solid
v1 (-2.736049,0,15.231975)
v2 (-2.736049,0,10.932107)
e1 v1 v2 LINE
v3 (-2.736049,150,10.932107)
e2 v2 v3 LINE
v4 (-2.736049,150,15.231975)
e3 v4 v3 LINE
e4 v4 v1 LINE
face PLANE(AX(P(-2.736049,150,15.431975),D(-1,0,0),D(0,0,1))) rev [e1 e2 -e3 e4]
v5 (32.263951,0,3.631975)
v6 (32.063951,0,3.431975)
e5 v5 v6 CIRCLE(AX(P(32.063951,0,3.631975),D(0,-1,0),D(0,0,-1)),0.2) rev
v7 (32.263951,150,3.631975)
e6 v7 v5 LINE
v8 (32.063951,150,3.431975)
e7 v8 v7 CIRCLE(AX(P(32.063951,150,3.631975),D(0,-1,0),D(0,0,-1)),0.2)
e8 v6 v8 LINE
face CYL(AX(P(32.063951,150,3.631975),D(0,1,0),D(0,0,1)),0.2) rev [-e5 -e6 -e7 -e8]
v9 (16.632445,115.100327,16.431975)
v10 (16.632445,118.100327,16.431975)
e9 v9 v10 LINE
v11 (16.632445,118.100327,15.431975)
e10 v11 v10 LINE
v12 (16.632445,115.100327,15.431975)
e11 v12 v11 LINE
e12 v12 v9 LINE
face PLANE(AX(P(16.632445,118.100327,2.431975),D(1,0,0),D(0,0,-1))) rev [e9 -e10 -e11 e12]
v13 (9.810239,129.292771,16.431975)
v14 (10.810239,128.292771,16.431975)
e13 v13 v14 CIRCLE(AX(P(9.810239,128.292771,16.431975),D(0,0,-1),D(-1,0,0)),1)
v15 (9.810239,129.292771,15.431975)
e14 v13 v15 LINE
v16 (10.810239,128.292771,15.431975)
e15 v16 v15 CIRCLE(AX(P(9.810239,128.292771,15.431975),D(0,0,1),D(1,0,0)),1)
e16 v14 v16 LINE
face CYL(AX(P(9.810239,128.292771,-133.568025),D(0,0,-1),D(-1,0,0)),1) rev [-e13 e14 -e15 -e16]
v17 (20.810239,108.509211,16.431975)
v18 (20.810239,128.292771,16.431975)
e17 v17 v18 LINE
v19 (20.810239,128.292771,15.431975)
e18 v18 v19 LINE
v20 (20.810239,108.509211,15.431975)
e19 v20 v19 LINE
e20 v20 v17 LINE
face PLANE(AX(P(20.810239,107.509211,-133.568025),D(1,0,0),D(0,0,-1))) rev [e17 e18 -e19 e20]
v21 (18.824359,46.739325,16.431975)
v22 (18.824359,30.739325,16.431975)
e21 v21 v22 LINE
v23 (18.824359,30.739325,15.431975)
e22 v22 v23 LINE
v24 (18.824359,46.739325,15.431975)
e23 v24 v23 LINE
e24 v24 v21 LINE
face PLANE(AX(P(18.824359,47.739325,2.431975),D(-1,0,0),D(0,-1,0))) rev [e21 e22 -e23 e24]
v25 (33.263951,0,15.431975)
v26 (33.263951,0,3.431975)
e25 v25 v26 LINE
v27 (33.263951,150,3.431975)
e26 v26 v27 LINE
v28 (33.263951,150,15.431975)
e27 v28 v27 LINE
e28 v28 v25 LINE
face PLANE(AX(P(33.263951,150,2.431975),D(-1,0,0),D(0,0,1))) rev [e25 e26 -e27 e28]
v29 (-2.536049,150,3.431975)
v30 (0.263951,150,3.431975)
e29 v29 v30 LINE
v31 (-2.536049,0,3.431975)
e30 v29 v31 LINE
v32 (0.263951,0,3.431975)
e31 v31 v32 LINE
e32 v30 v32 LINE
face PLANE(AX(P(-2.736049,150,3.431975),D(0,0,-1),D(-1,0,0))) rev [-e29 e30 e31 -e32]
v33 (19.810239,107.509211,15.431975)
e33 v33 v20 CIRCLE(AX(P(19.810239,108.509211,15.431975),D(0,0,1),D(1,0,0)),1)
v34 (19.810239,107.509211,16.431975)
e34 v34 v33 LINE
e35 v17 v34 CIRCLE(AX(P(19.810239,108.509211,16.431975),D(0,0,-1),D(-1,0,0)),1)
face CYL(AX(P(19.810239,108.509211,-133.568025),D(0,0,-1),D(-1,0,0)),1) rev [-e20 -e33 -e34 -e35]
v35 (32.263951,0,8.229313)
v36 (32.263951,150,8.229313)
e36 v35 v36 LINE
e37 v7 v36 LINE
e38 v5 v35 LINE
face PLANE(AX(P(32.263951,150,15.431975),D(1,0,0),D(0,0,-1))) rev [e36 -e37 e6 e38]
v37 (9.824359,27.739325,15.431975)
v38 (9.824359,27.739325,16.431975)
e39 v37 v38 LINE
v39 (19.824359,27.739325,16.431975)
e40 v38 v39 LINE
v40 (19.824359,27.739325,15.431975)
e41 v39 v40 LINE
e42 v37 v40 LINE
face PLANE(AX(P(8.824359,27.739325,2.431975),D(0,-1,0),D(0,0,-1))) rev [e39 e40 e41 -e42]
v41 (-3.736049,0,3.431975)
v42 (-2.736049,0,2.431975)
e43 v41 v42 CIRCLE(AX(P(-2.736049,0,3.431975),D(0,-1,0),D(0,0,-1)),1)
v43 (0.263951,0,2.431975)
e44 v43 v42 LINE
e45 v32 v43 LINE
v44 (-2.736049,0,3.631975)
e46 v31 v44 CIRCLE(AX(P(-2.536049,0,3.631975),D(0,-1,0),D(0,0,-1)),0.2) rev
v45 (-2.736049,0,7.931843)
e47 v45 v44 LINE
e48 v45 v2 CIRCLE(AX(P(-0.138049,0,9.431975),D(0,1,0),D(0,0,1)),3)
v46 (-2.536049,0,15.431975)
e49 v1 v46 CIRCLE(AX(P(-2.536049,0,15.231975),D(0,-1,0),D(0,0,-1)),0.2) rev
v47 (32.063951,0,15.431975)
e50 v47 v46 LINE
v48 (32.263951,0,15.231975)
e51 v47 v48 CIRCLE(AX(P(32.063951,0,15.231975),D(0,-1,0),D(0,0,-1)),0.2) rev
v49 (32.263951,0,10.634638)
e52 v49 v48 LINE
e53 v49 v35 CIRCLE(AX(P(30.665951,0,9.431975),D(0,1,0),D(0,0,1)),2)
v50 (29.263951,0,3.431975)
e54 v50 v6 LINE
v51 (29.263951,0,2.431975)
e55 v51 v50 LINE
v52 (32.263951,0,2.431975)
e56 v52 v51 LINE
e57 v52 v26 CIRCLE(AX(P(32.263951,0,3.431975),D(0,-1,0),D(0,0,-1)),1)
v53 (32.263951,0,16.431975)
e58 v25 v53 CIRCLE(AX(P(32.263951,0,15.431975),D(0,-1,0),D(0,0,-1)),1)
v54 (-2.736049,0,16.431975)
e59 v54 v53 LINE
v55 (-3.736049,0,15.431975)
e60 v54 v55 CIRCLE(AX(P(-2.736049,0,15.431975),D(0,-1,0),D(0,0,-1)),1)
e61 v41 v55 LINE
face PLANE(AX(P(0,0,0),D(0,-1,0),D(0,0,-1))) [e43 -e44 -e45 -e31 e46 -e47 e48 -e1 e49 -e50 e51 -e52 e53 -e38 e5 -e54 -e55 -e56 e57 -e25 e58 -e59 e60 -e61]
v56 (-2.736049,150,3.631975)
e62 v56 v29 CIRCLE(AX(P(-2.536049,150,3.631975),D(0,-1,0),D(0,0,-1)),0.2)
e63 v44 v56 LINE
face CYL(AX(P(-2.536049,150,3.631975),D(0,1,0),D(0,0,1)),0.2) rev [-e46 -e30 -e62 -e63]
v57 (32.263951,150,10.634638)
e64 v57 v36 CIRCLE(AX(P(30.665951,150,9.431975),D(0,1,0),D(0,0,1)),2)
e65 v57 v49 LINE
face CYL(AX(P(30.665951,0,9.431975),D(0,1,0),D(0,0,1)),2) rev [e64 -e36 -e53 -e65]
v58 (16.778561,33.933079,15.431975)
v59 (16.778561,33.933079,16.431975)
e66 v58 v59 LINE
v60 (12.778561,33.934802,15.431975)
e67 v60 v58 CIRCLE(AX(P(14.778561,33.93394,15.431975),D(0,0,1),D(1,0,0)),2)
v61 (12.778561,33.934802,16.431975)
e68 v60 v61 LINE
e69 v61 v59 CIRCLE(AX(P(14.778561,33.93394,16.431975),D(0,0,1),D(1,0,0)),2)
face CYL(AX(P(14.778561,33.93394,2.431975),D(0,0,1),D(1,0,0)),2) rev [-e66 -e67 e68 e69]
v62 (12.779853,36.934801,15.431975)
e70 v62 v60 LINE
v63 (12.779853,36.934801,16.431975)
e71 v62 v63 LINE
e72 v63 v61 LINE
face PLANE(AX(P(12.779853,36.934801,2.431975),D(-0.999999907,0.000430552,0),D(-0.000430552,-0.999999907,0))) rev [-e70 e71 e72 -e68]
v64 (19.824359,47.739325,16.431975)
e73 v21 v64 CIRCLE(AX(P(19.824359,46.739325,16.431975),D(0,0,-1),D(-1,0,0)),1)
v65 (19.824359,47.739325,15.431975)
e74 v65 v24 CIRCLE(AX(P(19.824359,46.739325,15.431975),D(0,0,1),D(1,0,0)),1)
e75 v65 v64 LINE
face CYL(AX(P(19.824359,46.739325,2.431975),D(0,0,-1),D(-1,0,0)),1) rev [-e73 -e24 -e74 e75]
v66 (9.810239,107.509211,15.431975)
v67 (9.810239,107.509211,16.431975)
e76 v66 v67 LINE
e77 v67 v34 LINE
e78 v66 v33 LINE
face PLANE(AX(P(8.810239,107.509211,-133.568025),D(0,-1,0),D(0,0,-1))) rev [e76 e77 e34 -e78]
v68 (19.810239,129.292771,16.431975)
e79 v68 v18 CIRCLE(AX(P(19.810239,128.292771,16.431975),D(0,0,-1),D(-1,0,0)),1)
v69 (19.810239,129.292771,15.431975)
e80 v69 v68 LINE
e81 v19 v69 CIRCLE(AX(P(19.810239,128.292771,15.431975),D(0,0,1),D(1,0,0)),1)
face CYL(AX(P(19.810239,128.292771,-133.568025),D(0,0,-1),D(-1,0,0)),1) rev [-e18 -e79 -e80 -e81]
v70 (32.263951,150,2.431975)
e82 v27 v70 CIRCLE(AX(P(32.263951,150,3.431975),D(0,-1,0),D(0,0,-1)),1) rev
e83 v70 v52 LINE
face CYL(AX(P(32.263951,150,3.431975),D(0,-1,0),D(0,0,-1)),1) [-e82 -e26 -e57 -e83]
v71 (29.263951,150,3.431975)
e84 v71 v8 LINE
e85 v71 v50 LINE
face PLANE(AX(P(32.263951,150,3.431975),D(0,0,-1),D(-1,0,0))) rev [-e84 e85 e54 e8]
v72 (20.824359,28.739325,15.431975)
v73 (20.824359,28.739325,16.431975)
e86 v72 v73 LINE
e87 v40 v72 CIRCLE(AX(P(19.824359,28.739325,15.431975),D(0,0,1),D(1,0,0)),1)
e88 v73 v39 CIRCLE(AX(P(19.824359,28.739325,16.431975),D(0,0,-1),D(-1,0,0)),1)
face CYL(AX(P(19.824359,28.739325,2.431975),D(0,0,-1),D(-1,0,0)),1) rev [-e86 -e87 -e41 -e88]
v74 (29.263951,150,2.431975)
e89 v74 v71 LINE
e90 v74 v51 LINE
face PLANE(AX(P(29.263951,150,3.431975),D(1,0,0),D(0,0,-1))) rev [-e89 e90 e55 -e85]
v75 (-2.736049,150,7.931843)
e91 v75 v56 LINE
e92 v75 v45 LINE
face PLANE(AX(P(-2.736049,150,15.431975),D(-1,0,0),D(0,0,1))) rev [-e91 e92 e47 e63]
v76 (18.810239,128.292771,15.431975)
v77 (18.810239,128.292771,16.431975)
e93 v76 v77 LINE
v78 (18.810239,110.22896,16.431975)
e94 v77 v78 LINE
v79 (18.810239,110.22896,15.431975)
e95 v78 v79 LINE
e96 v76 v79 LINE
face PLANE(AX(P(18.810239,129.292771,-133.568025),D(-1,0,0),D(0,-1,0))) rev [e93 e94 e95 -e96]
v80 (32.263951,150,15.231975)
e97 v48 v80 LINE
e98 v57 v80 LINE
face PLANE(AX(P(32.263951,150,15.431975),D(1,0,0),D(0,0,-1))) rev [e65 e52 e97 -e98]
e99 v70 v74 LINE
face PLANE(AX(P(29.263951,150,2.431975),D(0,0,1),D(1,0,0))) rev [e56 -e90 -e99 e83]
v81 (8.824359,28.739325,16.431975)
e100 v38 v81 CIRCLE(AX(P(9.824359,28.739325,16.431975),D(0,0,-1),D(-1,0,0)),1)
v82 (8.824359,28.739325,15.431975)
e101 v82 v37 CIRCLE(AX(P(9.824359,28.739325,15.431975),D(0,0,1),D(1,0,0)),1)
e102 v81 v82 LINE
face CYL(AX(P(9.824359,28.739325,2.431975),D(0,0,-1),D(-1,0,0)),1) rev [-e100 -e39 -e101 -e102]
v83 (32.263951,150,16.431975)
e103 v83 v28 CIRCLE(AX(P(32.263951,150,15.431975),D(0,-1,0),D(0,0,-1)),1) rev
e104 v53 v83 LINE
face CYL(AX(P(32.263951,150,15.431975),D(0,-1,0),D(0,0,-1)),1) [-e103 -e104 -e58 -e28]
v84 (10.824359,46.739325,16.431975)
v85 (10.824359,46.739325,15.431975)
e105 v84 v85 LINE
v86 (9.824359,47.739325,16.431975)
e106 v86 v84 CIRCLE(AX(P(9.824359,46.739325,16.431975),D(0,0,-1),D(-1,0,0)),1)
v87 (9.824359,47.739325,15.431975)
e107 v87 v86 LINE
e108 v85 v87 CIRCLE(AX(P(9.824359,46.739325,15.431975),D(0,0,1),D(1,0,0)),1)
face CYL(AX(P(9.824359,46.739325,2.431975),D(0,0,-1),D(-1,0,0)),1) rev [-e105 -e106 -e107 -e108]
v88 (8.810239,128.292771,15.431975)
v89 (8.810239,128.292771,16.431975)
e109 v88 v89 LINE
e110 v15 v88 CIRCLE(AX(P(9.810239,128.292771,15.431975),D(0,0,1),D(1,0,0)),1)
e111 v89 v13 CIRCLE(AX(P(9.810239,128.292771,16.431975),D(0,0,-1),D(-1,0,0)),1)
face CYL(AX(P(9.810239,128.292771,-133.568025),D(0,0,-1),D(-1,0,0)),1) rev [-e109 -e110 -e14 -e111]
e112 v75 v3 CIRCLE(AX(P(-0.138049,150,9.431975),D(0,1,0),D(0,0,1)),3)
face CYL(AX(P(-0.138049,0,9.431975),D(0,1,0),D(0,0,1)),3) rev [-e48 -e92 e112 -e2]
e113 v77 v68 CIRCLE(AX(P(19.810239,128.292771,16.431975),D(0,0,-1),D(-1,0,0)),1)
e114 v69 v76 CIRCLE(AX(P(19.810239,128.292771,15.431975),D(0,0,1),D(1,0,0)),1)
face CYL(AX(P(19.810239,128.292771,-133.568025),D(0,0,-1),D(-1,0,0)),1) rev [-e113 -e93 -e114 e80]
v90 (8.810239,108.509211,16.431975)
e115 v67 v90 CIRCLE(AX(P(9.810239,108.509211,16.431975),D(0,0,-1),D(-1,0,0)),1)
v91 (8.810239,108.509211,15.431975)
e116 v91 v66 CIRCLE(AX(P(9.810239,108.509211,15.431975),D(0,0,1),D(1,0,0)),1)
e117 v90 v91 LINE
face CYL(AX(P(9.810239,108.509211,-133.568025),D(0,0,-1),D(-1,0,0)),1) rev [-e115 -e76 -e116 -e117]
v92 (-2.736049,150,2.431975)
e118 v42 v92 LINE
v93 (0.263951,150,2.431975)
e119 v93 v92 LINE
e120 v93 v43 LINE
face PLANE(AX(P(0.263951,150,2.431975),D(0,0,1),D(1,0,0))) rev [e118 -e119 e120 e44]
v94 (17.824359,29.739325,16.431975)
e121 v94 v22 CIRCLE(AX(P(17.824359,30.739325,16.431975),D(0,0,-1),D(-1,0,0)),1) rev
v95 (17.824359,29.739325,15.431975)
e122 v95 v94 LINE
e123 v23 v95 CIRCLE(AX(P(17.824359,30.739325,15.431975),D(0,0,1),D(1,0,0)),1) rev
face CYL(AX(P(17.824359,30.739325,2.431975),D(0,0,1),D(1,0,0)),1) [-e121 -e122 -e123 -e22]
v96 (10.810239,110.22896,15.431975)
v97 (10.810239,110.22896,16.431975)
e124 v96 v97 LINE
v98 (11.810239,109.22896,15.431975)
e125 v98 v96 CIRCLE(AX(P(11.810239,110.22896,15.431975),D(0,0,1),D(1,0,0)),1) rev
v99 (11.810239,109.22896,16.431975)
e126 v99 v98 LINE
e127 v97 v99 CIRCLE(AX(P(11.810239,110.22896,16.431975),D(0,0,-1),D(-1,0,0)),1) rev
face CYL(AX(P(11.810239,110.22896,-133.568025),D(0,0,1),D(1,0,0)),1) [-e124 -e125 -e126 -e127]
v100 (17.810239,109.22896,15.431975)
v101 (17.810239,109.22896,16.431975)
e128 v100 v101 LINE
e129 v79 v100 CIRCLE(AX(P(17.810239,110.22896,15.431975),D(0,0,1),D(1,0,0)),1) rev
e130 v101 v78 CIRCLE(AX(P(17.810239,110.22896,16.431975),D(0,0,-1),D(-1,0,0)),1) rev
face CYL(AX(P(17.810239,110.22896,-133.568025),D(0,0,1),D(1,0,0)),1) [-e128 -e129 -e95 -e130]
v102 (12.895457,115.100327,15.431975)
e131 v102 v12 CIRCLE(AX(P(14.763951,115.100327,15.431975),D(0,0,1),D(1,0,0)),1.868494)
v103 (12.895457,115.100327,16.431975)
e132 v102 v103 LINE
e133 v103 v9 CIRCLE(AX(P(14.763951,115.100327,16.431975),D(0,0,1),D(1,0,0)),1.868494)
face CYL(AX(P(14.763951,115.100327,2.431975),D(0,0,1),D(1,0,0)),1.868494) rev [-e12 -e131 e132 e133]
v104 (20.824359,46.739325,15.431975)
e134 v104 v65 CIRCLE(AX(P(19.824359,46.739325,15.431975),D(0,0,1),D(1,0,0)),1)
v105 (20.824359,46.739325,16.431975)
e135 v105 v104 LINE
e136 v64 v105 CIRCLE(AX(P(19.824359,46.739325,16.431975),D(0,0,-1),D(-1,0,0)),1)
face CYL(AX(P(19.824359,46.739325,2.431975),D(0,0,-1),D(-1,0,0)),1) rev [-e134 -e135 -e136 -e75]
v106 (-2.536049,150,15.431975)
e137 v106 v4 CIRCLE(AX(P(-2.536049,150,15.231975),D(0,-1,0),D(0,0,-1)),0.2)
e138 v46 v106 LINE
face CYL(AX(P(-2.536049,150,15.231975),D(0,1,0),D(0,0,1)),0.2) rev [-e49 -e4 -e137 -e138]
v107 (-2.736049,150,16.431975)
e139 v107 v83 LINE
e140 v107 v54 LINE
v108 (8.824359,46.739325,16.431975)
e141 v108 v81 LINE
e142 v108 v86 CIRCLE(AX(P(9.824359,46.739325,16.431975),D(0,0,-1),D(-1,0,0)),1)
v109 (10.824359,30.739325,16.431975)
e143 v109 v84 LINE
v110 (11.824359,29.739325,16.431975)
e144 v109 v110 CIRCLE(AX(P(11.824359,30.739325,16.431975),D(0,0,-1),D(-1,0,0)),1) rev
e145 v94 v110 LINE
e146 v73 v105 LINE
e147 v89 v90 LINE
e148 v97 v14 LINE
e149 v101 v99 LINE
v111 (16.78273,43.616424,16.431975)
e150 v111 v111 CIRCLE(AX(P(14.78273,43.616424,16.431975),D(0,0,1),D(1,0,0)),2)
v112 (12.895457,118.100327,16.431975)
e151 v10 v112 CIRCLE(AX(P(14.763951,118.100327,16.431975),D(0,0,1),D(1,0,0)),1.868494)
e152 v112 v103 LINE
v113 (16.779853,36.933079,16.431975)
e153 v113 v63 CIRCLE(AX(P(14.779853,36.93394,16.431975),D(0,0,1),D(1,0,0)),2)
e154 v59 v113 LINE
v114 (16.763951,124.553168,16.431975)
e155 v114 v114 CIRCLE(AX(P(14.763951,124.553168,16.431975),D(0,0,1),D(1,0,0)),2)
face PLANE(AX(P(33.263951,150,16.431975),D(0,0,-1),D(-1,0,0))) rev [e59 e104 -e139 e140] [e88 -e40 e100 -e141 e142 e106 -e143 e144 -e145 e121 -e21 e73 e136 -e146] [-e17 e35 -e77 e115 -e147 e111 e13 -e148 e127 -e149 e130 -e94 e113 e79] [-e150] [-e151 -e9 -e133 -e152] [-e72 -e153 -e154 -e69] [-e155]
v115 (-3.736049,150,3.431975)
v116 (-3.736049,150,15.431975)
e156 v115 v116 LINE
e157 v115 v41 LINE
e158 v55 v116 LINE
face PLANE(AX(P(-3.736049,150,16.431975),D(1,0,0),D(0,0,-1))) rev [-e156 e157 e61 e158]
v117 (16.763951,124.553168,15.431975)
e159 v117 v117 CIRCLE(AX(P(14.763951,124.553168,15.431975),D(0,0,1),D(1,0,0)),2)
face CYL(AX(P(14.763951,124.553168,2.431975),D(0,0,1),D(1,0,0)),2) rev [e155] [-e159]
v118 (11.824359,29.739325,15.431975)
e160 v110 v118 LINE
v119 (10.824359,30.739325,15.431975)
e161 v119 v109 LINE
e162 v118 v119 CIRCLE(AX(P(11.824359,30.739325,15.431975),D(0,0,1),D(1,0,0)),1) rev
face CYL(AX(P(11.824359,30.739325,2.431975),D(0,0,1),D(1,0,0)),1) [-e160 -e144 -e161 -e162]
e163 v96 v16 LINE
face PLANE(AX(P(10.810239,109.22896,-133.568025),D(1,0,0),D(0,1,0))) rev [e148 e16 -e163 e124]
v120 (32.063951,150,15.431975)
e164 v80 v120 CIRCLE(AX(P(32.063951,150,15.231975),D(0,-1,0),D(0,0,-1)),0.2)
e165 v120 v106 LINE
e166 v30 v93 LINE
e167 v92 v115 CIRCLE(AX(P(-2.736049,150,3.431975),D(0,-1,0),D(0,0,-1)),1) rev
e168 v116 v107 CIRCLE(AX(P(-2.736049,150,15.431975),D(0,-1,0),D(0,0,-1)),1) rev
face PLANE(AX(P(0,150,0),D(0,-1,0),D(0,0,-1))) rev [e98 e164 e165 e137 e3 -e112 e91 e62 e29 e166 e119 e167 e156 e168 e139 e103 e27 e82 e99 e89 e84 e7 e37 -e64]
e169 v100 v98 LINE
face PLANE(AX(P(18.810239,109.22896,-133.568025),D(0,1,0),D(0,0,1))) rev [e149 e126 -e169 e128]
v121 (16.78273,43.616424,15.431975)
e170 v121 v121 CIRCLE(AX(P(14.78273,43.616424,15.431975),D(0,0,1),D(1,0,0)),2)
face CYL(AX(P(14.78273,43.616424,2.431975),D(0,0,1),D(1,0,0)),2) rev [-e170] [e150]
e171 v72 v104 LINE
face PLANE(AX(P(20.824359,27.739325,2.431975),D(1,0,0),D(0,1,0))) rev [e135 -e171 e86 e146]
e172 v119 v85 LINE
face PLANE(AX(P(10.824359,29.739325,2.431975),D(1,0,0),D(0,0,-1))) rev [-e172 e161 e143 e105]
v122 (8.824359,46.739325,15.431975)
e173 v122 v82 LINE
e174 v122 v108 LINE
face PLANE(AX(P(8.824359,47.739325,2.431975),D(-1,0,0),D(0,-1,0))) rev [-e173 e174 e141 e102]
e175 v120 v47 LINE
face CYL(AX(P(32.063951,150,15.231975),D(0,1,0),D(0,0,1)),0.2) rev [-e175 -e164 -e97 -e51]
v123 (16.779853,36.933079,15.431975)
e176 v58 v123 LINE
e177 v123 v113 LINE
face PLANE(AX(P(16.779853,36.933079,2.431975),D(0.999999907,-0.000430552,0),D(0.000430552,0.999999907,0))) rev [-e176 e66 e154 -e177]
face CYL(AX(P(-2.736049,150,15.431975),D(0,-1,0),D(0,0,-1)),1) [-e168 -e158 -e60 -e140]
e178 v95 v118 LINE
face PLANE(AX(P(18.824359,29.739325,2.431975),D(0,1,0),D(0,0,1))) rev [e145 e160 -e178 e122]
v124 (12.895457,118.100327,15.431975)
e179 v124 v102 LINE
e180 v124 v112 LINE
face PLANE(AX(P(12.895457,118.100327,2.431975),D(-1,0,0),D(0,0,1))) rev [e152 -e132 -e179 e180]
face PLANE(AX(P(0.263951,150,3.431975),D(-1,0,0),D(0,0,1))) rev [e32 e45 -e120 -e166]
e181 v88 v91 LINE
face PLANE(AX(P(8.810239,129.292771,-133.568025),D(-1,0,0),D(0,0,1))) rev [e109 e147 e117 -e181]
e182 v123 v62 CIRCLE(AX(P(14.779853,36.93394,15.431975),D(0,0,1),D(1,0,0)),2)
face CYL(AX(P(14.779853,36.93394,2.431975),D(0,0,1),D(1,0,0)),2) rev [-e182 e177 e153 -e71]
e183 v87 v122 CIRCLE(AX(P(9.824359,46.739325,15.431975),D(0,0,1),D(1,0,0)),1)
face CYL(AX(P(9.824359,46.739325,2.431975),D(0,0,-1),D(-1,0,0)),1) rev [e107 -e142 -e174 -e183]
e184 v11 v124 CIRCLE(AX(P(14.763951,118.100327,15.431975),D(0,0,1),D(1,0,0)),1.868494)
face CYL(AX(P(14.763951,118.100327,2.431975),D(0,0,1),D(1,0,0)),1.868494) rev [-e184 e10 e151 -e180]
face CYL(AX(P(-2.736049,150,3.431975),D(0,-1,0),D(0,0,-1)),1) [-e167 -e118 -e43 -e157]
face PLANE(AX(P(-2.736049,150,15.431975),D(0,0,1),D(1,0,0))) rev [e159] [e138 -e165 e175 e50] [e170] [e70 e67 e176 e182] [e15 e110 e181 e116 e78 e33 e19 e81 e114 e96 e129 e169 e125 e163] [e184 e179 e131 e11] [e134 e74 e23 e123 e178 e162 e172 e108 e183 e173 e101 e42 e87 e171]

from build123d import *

# Parameters (mm, degrees)
BOSS_EXTRUDE1_DEPTH = 150
FILLET1_R           = 1
FILLET2_R           = 0.2
SKETCH2_R           = 2
CUT_EXTRUDE1_DEPTH  = 155.280557534
CUT_EXTRUDE2_DEPTH  = 155.280557534
CUT_EXTRUDE3_DEPTH  = 150
FILLET7_R           = 1
SKETCH7_R           = 2
CUT_EXTRUDE4_DEPTH  = 155.280557534
CUT_EXTRUDE6_DEPTH  = 155.280557534
FILLET9_R           = 1
SKETCH12_R          = 2
SKETCH12_R_2        = 3
CUT_EXTRUDE7_DEPTH  = 155.520226026


with BuildPart() as part:
    # Sketch1 → Boss-Extrude1 (new body)
    with BuildSketch(Plane(origin=(0, 0, 0), x_dir=(1, 0, 0), z_dir=(0, 1, 0))):
        Polygon((-2.736049046, -15.431975477), (32.263950954, -15.431975477), (32.263950954, -3.431975477), (29.263950954, -3.431975477), (29.263950954, -2.431975477), (33.263950954, -2.431975477), (33.263950954, -16.431975477), (-3.736049046, -16.431975477), (-3.736049046, -2.431975477), (0.263950954, -2.431975477), (0.263950954, -3.431975477), (-2.736049046, -3.431975477), align=None)
    extrude(amount=BOSS_EXTRUDE1_DEPTH)

    # Fillet1
    fillet1_edges = [part.edges().sort_by_distance(p)[0] for p in [
        (33.263950954, 75, 2.431975477),
        (33.263950954, 75, 16.431975477),
        (-3.736049046, 75, 16.431975477),
        (-3.736049046, 75, 2.431975477),
    ]]
    fillet(fillet1_edges, radius=FILLET1_R)

    # Fillet2
    fillet2_edges = [part.edges().sort_by_distance(p)[0] for p in [
        (-2.736049046, 75, 15.431975477),
        (32.263950954, 75, 15.431975477),
        (32.263950954, 75, 3.431975477),
        (-2.736049046, 75, 3.431975477),
    ]]
    fillet(fillet2_edges, radius=FILLET2_R)

    # Sketch2 → Cut-Extrude1 (cut, through all)
    with BuildSketch(Plane.XY.offset(16.431975477)):
        with Locations((14.763950954, 124.553168405)):
            Circle(SKETCH2_R)
    extrude(amount=-CUT_EXTRUDE1_DEPTH, mode=Mode.SUBTRACT)

    # Sketch4 → Cut-Extrude2 (cut, through all)
    with BuildSketch(Plane.XY.offset(16.431975477)):
        with BuildLine():
            Line((16.632444953, 118.100326697), (16.632444953, 115.100326697))
            ThreePointArc((16.632444953, 115.100326697), (14.763950954, 113.231832698), (12.895456955, 115.100326697))
            Line((12.895456955, 115.100326697), (12.895456955, 118.100326697))
            ThreePointArc((12.895456955, 118.100326697), (14.763950954, 119.968820696), (16.632444953, 118.100326697))
        make_face()
    extrude(amount=-CUT_EXTRUDE2_DEPTH, mode=Mode.SUBTRACT)

    # Sketch6 → Cut-Extrude3 (cut)
    with BuildSketch(Plane.XY.offset(16.431975477)):
        Polygon((18.810239274, 129.292771491), (18.810239274, 109.228960099), (10.810239274, 109.228960099), (10.810239274, 129.292771491), (8.810239274, 129.292771491), (8.810239274, 107.509210665), (20.810239274, 107.509210665), (20.810239274, 129.292771491), align=None)
    extrude(amount=-CUT_EXTRUDE3_DEPTH, mode=Mode.SUBTRACT)

    # Fillet7
    fillet7_edges = [part.edges().sort_by_distance(p)[0] for p in [
        (8.810239274, 107.509210665, 15.931975477),
        (20.810239274, 107.509210665, 15.931975477),
        (18.810239274, 109.228960099, 15.931975477),
        (10.810239274, 109.228960099, 15.931975477),
        (10.810239274, 129.292771491, 15.931975477),
        (8.810239274, 129.292771491, 15.931975477),
        (18.810239274, 129.292771491, 15.931975477),
        (20.810239274, 129.292771491, 15.931975477),
    ]]
    fillet(fillet7_edges, radius=FILLET7_R - 0.0001)  # a hair under: the kernel refuses the full size

    # Sketch7 → Cut-Extrude4 (cut, through all)
    with BuildSketch(Plane.XY.offset(16.431975477)):
        with Locations((14.782730099, 43.616424241)):
            Circle(SKETCH7_R)
        with BuildLine():
            Line((16.779852756, 36.933079114), (16.778561099, 33.933079392))
            ThreePointArc((16.778561099, 33.933079392), (14.77770018, 31.933940682), (12.77856147, 33.9348016))
            Line((12.77856147, 33.9348016), (12.779853126, 36.934801322))
            ThreePointArc((12.779853126, 36.934801322), (14.780714045, 38.933940033), (16.779852756, 36.933079114))
        make_face()
    extrude(amount=-CUT_EXTRUDE4_DEPTH, mode=Mode.SUBTRACT)

    # Sketch9 → Cut-Extrude6 (cut, through all)
    with BuildSketch(Plane.XY.offset(16.431975477)):
        Polygon((18.824358564, 47.739325349), (18.824358564, 29.739325349), (10.824358564, 29.739325349), (10.824358564, 47.739325349), (8.824358564, 47.739325349), (8.824358564, 27.739325349), (20.824358564, 27.739325349), (20.824358564, 47.739325349), align=None)
    extrude(amount=-CUT_EXTRUDE6_DEPTH, mode=Mode.SUBTRACT)

    # Fillet9
    fillet9_edges = [part.edges().sort_by_distance(p)[0] for p in [
        (20.824358564, 27.739325349, 15.931975477),
        (18.824358564, 29.739325349, 15.931975477),
        (8.824358564, 27.739325349, 15.931975477),
        (10.824358564, 29.739325349, 15.931975477),
        (8.824358564, 47.739325349, 15.931975477),
        (10.824358564, 47.739325349, 15.931975477),
        (18.824358564, 47.739325349, 15.931975477),
        (20.824358564, 47.739325349, 15.931975477),
    ]]
    fillet(fillet9_edges, radius=FILLET9_R - 0.0001)  # a hair under: the kernel refuses the full size

    # Sketch12 → Cut-Extrude7 (cut, through all)
    with BuildSketch(Plane(origin=(0, 150, 0), x_dir=(1, 0, 0), z_dir=(0, 1, 0))):
        with Locations((30.665950954, -9.431975477)):
            Circle(SKETCH12_R)
        with Locations((-0.138049046, -9.431975477)):
            Circle(SKETCH12_R_2)
    extrude(amount=-CUT_EXTRUDE7_DEPTH, mode=Mode.SUBTRACT)


solid = part.part
